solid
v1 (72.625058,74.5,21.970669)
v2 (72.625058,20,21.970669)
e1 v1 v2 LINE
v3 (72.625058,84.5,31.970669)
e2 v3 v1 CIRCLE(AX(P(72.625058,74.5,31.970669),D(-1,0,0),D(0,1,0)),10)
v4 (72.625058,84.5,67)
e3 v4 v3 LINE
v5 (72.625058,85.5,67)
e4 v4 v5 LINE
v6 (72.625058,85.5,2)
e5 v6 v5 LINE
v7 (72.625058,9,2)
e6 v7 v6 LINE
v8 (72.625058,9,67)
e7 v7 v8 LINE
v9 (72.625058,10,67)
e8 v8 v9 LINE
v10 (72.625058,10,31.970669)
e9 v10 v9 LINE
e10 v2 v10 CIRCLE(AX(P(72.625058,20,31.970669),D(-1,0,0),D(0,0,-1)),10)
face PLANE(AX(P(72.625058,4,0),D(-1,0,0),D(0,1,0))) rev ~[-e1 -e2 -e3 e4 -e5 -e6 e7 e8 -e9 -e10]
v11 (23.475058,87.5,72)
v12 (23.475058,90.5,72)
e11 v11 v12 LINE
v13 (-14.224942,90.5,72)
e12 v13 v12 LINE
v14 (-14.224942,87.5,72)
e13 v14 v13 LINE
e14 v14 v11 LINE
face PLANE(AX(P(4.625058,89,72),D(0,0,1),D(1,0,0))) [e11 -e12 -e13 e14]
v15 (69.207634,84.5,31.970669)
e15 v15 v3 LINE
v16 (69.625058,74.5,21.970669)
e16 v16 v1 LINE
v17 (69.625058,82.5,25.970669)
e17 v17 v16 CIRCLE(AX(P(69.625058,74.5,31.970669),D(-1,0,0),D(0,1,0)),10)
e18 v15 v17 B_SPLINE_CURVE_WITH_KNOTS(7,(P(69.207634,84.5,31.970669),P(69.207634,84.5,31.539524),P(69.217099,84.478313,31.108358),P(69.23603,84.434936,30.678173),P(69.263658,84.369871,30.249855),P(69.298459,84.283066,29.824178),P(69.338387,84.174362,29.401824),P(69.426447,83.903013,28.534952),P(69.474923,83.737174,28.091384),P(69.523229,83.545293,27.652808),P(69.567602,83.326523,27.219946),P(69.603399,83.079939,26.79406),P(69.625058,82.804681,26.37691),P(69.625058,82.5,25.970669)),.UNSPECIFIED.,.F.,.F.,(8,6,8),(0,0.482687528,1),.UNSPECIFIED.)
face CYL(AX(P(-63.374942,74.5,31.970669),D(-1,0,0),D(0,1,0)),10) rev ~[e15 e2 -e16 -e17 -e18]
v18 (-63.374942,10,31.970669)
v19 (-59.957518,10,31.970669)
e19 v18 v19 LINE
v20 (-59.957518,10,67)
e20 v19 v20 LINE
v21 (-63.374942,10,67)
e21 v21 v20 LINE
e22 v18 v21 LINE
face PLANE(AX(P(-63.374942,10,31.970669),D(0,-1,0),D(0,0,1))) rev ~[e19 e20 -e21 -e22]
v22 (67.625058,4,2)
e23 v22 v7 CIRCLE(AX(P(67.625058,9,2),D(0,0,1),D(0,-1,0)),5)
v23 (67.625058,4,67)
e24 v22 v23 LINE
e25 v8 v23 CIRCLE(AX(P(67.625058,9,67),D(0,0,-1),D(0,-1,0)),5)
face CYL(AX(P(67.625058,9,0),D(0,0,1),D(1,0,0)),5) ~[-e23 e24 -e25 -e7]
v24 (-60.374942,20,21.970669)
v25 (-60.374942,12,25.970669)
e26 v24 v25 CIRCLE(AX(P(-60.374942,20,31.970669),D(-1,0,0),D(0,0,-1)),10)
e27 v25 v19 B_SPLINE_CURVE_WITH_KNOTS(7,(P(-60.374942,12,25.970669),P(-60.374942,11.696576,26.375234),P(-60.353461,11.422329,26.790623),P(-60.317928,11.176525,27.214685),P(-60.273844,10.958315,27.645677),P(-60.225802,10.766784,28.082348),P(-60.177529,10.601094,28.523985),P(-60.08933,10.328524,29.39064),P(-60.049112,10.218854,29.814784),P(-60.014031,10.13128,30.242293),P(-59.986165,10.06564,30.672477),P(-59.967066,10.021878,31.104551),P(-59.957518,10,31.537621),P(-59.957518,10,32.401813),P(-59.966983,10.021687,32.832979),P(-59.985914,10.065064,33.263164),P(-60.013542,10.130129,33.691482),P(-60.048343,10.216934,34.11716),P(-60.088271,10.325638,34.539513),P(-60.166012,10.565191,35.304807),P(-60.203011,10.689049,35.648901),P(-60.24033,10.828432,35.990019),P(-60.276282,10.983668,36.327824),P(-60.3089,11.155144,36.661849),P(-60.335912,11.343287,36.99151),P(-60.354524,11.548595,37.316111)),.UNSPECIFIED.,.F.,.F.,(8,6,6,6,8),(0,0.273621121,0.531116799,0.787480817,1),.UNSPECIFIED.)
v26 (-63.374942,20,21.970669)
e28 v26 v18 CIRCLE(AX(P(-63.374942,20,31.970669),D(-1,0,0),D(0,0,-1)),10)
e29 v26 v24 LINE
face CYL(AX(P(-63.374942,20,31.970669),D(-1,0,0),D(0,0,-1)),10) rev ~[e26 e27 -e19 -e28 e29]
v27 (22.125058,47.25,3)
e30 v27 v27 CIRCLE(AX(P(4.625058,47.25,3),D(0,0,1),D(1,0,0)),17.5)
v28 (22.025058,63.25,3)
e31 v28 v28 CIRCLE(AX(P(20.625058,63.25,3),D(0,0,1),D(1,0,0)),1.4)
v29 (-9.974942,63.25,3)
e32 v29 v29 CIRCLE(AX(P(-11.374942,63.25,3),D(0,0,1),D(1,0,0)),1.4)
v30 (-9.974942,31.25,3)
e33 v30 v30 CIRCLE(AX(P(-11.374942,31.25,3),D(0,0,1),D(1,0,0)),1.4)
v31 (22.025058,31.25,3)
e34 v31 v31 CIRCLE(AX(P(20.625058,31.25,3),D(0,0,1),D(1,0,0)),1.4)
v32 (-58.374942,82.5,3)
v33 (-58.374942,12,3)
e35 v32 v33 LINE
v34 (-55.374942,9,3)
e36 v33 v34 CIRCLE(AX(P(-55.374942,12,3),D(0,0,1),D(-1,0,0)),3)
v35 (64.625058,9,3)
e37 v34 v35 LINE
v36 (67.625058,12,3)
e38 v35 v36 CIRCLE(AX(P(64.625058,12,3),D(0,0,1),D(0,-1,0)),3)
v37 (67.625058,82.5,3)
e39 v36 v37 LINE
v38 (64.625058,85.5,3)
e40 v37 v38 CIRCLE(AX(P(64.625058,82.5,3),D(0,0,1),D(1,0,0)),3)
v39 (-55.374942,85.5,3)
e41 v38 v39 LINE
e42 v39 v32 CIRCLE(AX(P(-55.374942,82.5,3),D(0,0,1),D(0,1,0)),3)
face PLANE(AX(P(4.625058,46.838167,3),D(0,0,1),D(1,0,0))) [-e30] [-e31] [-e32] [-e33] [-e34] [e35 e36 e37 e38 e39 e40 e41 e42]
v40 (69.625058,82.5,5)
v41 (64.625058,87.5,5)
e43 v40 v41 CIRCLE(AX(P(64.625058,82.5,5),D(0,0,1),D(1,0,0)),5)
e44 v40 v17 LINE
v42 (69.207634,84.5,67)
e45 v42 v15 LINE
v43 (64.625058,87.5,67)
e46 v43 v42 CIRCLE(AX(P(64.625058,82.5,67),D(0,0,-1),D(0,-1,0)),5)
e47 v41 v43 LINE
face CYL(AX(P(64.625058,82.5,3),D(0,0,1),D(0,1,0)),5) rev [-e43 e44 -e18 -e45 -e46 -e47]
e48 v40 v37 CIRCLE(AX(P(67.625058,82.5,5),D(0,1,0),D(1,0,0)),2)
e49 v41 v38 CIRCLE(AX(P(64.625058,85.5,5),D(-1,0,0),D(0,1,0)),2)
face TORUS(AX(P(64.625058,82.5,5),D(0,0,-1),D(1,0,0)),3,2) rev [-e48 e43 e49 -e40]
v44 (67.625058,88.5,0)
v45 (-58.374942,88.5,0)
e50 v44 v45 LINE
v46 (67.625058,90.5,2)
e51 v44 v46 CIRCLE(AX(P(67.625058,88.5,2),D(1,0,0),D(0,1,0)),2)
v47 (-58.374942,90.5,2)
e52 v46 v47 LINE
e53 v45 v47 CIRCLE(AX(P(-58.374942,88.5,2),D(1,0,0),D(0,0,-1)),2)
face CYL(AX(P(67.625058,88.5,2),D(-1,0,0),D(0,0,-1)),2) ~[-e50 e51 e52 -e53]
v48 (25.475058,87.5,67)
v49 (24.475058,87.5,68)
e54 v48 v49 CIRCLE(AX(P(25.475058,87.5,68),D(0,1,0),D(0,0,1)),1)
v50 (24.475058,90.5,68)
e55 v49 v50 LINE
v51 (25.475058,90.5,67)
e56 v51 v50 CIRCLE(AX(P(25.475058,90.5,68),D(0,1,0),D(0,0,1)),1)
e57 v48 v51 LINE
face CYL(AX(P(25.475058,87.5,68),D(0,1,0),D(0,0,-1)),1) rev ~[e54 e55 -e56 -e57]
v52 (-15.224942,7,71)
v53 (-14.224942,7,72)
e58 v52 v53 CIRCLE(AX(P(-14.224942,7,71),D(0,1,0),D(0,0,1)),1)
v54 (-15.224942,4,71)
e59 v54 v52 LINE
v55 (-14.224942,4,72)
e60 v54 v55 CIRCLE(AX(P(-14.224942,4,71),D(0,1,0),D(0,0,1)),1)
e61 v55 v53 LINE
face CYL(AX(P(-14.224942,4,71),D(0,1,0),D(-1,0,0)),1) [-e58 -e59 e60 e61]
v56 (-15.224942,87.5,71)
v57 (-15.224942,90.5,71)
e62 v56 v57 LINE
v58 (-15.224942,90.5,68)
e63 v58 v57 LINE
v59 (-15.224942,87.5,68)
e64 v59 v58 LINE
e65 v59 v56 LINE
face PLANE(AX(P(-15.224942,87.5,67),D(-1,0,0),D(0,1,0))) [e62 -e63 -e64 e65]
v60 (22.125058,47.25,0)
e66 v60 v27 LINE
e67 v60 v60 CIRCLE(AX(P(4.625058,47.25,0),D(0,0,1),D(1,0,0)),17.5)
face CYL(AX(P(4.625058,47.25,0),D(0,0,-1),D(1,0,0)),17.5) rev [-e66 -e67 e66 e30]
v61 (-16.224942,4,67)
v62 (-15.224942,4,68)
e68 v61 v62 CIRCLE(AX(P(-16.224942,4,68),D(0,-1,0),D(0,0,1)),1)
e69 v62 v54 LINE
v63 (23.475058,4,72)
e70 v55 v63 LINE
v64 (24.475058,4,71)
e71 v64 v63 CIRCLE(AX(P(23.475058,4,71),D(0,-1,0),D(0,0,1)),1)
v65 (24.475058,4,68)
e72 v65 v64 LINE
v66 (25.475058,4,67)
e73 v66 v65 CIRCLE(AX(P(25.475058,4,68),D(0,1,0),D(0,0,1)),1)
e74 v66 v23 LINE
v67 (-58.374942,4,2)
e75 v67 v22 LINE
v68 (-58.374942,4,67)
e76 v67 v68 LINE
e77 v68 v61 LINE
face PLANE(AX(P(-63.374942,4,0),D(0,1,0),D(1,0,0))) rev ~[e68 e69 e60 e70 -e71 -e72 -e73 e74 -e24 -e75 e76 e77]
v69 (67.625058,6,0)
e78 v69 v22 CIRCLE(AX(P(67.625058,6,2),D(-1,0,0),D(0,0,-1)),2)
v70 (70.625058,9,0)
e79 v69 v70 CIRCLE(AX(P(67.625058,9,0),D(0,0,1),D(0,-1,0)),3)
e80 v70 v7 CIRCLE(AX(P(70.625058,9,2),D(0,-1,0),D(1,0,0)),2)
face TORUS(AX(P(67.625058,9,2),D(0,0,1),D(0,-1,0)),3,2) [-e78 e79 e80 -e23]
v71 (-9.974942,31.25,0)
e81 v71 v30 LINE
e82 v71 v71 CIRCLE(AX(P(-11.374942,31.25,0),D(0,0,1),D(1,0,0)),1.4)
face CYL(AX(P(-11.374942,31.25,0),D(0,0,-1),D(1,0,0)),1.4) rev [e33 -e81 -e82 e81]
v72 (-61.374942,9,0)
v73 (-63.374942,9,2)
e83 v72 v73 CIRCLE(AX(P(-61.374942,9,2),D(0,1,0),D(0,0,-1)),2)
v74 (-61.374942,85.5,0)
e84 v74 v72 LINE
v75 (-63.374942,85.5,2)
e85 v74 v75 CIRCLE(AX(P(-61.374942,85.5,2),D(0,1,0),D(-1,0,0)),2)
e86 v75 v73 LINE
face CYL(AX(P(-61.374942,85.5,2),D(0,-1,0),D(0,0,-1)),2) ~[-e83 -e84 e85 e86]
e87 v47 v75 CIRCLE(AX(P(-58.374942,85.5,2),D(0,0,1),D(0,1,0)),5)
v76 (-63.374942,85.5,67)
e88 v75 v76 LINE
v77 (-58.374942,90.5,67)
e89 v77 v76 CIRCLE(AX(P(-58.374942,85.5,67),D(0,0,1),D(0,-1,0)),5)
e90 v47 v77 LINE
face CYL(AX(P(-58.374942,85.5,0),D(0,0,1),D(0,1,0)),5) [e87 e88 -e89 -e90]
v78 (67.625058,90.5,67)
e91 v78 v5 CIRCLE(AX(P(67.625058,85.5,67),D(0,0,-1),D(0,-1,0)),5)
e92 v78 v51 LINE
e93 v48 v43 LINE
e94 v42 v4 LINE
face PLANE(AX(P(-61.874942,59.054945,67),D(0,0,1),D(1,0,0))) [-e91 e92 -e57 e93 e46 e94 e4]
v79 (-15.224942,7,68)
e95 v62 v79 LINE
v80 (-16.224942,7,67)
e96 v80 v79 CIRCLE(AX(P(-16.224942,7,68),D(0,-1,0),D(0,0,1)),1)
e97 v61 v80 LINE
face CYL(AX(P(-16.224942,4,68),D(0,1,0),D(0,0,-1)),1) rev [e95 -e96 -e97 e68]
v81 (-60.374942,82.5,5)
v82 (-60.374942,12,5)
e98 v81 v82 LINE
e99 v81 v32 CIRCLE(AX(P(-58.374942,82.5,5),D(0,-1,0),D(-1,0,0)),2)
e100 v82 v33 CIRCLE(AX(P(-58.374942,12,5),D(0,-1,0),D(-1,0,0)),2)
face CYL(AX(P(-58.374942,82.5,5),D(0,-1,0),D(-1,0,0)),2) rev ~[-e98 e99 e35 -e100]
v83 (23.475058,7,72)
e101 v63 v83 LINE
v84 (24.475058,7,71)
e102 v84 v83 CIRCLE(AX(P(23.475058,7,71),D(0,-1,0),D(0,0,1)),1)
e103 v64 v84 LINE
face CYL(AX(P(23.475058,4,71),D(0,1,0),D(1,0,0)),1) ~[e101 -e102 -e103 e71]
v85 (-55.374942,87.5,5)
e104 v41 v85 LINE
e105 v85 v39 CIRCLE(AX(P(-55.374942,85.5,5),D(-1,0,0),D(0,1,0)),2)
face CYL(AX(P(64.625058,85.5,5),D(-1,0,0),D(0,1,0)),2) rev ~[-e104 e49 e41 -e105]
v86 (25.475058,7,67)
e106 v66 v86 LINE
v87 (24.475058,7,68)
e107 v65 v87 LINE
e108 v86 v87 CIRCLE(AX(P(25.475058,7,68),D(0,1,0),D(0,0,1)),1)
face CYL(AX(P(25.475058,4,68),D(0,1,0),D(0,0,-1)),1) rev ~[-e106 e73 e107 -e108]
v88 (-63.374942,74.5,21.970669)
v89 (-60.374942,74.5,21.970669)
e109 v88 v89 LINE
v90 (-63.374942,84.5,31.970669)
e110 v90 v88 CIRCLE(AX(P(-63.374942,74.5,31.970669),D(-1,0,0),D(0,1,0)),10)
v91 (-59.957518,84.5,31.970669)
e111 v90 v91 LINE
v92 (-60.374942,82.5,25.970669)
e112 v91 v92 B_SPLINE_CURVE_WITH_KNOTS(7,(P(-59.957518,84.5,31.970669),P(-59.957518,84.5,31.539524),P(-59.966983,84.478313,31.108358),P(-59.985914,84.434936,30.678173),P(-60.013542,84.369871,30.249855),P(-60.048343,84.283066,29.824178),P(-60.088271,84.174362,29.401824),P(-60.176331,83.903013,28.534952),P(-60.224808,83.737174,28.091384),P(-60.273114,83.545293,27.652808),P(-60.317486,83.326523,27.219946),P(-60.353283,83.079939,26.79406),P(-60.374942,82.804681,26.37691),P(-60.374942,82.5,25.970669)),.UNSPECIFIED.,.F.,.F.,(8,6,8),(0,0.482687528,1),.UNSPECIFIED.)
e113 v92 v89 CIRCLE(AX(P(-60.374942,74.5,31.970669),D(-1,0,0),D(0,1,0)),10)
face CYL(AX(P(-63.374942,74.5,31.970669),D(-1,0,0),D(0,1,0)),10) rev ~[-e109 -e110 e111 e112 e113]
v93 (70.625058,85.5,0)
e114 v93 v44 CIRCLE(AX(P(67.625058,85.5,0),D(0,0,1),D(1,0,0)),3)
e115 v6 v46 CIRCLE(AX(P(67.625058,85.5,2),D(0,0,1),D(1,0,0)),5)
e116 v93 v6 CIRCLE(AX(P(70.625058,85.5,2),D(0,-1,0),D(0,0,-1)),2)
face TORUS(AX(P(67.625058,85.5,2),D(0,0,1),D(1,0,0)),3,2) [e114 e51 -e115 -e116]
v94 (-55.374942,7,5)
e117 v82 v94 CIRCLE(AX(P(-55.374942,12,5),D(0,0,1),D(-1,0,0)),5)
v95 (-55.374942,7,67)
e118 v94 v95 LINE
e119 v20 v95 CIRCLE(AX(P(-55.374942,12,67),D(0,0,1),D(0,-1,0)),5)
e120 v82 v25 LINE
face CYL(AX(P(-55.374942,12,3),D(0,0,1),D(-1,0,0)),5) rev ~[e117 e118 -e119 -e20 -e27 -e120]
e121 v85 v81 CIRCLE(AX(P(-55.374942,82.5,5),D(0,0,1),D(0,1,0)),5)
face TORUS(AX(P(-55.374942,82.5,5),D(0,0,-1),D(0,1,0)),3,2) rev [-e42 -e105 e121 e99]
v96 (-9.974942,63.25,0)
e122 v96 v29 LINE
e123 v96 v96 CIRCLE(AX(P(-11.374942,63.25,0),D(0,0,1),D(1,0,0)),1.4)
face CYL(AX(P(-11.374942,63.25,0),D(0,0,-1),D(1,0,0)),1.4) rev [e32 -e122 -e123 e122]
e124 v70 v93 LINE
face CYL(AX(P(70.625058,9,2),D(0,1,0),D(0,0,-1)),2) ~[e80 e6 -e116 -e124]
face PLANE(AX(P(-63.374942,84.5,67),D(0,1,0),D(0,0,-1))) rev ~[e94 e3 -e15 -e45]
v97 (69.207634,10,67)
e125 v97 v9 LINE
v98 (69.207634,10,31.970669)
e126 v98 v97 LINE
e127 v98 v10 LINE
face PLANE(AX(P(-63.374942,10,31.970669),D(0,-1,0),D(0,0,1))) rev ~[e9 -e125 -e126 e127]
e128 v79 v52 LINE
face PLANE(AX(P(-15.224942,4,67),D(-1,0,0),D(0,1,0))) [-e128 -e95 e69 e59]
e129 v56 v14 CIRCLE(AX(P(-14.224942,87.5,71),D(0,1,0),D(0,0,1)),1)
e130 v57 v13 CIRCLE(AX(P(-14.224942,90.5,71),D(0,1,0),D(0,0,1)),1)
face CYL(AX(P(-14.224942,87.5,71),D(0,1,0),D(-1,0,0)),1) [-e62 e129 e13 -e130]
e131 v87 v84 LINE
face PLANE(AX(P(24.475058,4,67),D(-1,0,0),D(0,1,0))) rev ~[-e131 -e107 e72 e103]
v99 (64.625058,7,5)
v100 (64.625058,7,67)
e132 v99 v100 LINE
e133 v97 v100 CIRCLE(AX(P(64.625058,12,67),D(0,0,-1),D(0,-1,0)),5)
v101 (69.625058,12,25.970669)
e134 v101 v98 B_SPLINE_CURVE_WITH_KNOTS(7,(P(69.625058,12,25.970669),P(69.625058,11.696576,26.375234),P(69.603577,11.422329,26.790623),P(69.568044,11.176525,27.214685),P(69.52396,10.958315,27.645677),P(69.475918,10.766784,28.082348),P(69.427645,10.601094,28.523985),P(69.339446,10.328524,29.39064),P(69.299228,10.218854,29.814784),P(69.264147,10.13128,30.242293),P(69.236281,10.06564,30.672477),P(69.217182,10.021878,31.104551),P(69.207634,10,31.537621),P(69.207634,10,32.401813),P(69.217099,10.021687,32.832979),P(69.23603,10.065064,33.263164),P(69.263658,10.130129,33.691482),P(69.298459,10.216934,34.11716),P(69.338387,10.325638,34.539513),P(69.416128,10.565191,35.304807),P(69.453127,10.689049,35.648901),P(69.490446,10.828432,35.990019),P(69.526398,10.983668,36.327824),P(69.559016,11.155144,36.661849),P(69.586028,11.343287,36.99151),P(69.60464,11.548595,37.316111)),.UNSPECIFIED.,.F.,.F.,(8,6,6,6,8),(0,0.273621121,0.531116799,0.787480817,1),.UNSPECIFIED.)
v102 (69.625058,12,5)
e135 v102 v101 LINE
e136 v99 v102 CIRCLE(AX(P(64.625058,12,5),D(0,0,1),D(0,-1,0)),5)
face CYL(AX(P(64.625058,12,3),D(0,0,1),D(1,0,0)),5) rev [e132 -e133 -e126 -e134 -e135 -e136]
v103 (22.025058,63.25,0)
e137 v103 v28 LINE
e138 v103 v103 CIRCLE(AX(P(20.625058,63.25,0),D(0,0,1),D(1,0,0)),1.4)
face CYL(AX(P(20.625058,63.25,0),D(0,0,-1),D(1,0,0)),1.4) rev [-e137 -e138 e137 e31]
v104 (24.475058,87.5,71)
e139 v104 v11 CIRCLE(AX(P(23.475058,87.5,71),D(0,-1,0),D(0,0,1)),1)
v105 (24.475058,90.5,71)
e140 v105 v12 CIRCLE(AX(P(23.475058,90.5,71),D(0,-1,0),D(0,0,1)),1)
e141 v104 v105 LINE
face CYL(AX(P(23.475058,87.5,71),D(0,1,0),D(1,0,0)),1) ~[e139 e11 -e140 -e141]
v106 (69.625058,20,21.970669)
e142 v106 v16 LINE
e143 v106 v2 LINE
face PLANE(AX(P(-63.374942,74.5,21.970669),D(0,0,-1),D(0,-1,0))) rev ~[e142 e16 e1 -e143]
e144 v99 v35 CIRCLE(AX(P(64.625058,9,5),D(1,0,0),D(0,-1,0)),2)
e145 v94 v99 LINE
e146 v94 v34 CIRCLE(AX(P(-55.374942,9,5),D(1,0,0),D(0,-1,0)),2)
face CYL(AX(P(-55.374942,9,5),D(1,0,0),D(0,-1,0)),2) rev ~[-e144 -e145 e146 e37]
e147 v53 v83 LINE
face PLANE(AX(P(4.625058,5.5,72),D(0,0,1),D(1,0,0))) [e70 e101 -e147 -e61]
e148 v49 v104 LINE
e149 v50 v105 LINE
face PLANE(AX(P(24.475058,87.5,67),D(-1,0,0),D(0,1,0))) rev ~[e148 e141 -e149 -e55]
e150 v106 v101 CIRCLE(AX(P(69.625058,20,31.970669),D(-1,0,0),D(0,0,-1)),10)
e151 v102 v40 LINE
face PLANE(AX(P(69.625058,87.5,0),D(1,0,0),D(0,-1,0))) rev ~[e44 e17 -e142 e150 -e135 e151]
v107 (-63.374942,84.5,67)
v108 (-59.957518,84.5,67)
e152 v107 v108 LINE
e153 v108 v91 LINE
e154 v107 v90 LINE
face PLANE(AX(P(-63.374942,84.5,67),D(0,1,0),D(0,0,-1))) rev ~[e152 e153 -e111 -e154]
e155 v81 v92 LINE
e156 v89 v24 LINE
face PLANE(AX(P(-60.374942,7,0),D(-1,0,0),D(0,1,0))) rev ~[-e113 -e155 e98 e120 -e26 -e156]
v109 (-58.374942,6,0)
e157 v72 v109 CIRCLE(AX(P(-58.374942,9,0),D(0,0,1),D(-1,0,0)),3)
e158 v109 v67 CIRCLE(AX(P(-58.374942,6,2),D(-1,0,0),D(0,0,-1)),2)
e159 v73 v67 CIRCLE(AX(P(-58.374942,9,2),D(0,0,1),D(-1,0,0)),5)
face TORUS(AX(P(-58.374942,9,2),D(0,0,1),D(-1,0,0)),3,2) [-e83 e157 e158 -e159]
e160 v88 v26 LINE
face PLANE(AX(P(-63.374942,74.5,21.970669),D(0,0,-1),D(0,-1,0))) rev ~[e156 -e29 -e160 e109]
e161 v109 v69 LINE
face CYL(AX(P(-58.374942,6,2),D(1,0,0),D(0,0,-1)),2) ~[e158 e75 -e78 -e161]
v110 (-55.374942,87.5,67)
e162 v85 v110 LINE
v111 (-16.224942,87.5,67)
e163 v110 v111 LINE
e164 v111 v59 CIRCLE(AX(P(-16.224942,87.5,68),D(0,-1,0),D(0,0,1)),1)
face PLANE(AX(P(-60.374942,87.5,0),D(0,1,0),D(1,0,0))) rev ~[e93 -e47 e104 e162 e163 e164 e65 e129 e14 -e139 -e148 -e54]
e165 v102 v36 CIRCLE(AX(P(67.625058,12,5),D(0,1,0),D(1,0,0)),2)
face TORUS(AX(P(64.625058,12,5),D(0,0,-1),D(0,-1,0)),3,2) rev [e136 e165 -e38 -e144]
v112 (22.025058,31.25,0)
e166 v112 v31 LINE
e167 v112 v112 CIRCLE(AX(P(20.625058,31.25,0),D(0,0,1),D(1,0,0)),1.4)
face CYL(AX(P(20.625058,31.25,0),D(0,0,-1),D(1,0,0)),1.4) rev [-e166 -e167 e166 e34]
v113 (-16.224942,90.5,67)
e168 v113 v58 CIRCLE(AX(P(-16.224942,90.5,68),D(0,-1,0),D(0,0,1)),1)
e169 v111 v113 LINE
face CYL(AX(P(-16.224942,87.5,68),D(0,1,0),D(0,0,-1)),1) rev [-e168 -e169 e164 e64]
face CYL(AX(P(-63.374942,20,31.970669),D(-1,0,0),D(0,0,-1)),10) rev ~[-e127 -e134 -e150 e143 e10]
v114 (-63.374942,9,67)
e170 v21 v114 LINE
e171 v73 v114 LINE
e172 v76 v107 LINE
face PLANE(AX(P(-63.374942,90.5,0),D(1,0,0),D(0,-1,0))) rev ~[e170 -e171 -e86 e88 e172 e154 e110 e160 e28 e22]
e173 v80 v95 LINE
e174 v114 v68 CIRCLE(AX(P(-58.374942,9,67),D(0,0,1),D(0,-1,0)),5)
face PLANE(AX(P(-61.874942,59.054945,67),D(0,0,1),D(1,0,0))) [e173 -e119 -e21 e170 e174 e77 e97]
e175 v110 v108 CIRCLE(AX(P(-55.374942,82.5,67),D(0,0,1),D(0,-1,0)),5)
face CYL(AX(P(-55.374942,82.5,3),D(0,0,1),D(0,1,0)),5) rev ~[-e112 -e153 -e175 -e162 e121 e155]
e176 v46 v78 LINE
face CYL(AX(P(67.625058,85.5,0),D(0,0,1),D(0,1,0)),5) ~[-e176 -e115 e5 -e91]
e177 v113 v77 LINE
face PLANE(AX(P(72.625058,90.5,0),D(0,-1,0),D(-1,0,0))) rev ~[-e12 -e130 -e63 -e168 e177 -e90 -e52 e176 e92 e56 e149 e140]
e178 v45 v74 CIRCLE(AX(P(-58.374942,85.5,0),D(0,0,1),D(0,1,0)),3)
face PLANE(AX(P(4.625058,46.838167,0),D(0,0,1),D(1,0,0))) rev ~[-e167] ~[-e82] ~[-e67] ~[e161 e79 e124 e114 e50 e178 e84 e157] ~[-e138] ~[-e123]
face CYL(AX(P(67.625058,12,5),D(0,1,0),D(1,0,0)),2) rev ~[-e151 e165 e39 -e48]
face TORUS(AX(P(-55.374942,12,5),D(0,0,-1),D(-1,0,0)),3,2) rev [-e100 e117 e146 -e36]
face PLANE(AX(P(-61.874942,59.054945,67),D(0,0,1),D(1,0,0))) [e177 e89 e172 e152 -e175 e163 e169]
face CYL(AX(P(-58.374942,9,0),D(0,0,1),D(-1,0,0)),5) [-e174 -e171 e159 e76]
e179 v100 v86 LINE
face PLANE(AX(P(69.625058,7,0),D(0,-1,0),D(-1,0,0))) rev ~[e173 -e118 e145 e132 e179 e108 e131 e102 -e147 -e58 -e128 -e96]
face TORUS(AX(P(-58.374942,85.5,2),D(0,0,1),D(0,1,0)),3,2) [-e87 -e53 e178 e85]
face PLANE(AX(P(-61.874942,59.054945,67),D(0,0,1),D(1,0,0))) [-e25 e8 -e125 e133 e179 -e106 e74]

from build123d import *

# Parameters (mm, degrees)
F0_R     = 3
F0_R_2   = 1.4
F0_R_3   = 17.5
F0_R_4   = 1.5
F1_DEPTH = 3
F0_W     = 65
F0_H     = 3
F2_DEPTH = 67
F4_DEPTH = 136.001
F5_W     = 39.7
F5_H     = 3
F6_W     = 39.7
F6_H     = 3
F7_DEPTH = 5
F8_R     = 1
F9_R     = 5
F10_R    = 2


# Not quite as in the source:
# - a feature names something its author has since deleted; it is built from what else it names


with BuildPart() as f1:
    # F0 (on Top) → F1 (new body)
    with BuildSketch(Plane.XY):
        Polygon((-60.3749420391, 27.6098903269), (-60.3749420391, 7), (-15.3749420391, 7), (-15.3749420391, 12), (24.6250579609, 12), (24.6250579609, 7), (69.6250579609, 7), (69.6250579609, 53.4099719524), (69.6250579609, 87.5), (4.6250579609, 87.5), (-60.3749420391, 87.5), (-60.3749420391, 71.25), align=None)
        with Locations((-30.3749420391, 23.25)):
            Circle(F0_R, mode=Mode.SUBTRACT)
        with Locations((-11.3749420391, 31.25)):
            Circle(F0_R_2, mode=Mode.SUBTRACT)
        with Locations((20.6250579609, 31.25)):
            Circle(F0_R_2, mode=Mode.SUBTRACT)
        with Locations((52.6250579609, 23.25)):
            Circle(F0_R, mode=Mode.SUBTRACT)
        with Locations((-11.3749420391, 63.25)):
            Circle(F0_R_2, mode=Mode.SUBTRACT)
        with BuildLine():
            ThreePointArc((-27.3749420391, 71.25), (-30.3749420391, 68.25), (-33.3749420391, 71.25))
            ThreePointArc((-33.3749420391, 71.25), (-30.3749420391, 74.25), (-27.3749420391, 71.25))
        make_face(mode=Mode.SUBTRACT)
        with Locations((4.6250579609, 47.25)):
            Circle(F0_R_3, mode=Mode.SUBTRACT)
        with Locations((20.6250579609, 63.25)):
            Circle(F0_R_2, mode=Mode.SUBTRACT)
        with Locations((52.6250579609, 71.25)):
            Circle(F0_R, mode=Mode.SUBTRACT)
        Polygon((-15.3749420391, 12), (-15.3749420391, 7), (14.8769766092, 7), (24.6250579609, 7), (24.6250579609, 12), align=None)
        with BuildLine():
            ThreePointArc((-27.3749420391, 71.25), (-30.3749420391, 74.25), (-33.3749420391, 71.25))
            ThreePointArc((-33.3749420391, 71.25), (-30.3749420391, 68.25), (-27.3749420391, 71.25))
        make_face()
        with BuildLine():
            ThreePointArc((-28.8749420391, 71.25), (-30.3749420391, 69.75), (-31.8749420391, 71.25))
            ThreePointArc((-31.8749420391, 71.25), (-30.3749420391, 72.75), (-28.8749420391, 71.25))
        make_face(mode=Mode.SUBTRACT)
        with BuildLine():
            ThreePointArc((-28.8749420391, 71.25), (-30.3749420391, 72.75), (-31.8749420391, 71.25))
            ThreePointArc((-31.8749420391, 71.25), (-30.3749420391, 69.75), (-28.8749420391, 71.25))
        make_face()
        with Locations((52.6250579609, 71.25)):
            Circle(F0_R)
        with Locations((52.6250579609, 71.25)):
            Circle(F0_R_4, mode=Mode.SUBTRACT)
        with Locations((52.6250579609, 71.25)):
            Circle(F0_R_4)
        with Locations((52.6250579609, 23.25)):
            Circle(F0_R)
        with Locations((52.6250579609, 23.25)):
            Circle(F0_R_4, mode=Mode.SUBTRACT)
        with Locations((52.6250579609, 23.25)):
            Circle(F0_R_4)
        with Locations((-30.3749420391, 23.25)):
            Circle(F0_R)
        with Locations((-30.3749420391, 23.25)):
            Circle(F0_R_4, mode=Mode.SUBTRACT)
        with Locations((-30.3749420391, 23.25)):
            Circle(F0_R_4)
    extrude(amount=F1_DEPTH)

    # F0 (on Top) → F2 (join)
    with BuildSketch(Plane.XY):
        Polygon((-63.3749420391, 27.6098903269), (-60.3749420391, 27.6098903269), (-60.3749420391, 71.25), (-60.3749420391, 87.5), (-60.3749420391, 90.5), (-63.3749420391, 90.5), align=None)
        with Locations((-27.8749420391, 89)):
            Rectangle(F0_W, F0_H)
        with Locations((37.1250579609, 89)):
            Rectangle(F0_W, F0_H)
        Polygon((69.6250579609, 87.5), (69.6250579609, 53.4099719524), (72.6250579609, 53.4099719524), (72.6250579609, 90.5), (69.6250579609, 90.5), align=None)
        Polygon((69.6250579609, 7), (69.6250579609, 4), (72.6250579609, 4), (72.6250579609, 53.4099719524), (69.6250579609, 53.4099719524), align=None)
        Polygon((14.8769766092, 4), (69.6250579609, 4), (69.6250579609, 7), (24.6250579609, 7), (14.8769766092, 7), align=None)
        Polygon((-60.3749420391, 7), (-60.3749420391, 4), (14.8769766092, 4), (14.8769766092, 7), (-15.3749420391, 7), align=None)
        Polygon((-63.3749420391, 4), (-60.3749420391, 4), (-60.3749420391, 7), (-60.3749420391, 27.6098903269), (-63.3749420391, 27.6098903269), align=None)
    extrude(amount=F2_DEPTH)

    # F3 (on face) → F4 (cut, through all)
    with BuildSketch(Plane(origin=(-63.3749420391, 0, 0), x_dir=(0, -1, 0), z_dir=(-1, 0, 0))):
        with BuildLine():
            ThreePointArc((-20, 21.9706685841), (-12.9289321881, 24.8996007722), (-10, 31.9706685841))
            ThreePointArc((-10, 31.9706685841), (-20, 41.9706685841), (-30, 31.9706685841))
            ThreePointArc((-30, 31.9706685841), (-27.0710678119, 24.8996007722), (-20, 21.9706685841))
        make_face()
        with BuildLine():
            ThreePointArc((-30, 31.9706685841), (-20, 41.9706685841), (-10, 31.9706685841))
            Line((-10, 31.9706685841), (-10, 67))
            Line((-10, 67), (-30, 67))
            Line((-30, 67), (-30, 31.9706685841))
        make_face()
        with BuildLine():
            ThreePointArc((-74.5, 21.9706685841), (-67.4289321881, 24.8996007722), (-64.5, 31.9706685841))
            ThreePointArc((-64.5, 31.9706685841), (-74.5, 41.9706685841), (-84.5, 31.9706685841))
            ThreePointArc((-84.5, 31.9706685841), (-81.5710678119, 24.8996007722), (-74.5, 21.9706685841))
        make_face()
        with BuildLine():
            Line((-64.5, 31.9706685841), (-30, 31.9706685841))
            Line((-30, 31.9706685841), (-30, 67))
            Line((-30, 67), (-84.5, 67))
            Line((-84.5, 67), (-84.5, 31.9706685841))
            ThreePointArc((-84.5, 31.9706685841), (-74.5, 41.9706685841), (-64.5, 31.9706685841))
        make_face()
        with BuildLine():
            ThreePointArc((-20, 21.9706685841), (-27.0710678119, 24.8996007722), (-30, 31.9706685841))
            Line((-30, 31.9706685841), (-64.5, 31.9706685841))
            ThreePointArc((-64.5, 31.9706685841), (-67.4289321881, 24.8996007722), (-74.5, 21.9706685841))
            Line((-74.5, 21.9706685841), (-20, 21.9706685841))
        make_face()
    extrude(amount=-F4_DEPTH, mode=Mode.SUBTRACT)

    # F5 (on face) + F6 (on face) → F7 (join)
    with BuildSketch(Plane.XY.offset(67)):
        with Locations((4.6250579609, 5.5)):
            Rectangle(F5_W, F5_H)
    with BuildSketch(Plane.XY.offset(67)):
        with Locations((4.6250579609, 89)):
            Rectangle(F6_W, F6_H)
    extrude(amount=F7_DEPTH)

    # F8
    f8_edges = [f1.edges().sort_by_distance(p)[0] for p in [
        (-15.224942, 5.5, 67),
        (-15.224942, 5.5, 72),
        (24.475058, 5.5, 72),
        (24.475058, 5.5, 67),
        (-15.224942, 89, 67),
        (-15.224942, 89, 72),
        (24.475058, 89, 72),
        (24.475058, 89, 67),
    ]]
    fillet(f8_edges, radius=F8_R)

    # F9
    f9_edges = [f1.edges().sort_by_distance(p)[0] for p in [
        (72.625058, 4, 33.5),
        (72.625058, 90.5, 33.5),
        (-63.374942, 90.5, 33.5),
        (-63.374942, 4, 33.5),
        (-60.374942, 7, 35),
        (-60.374942, 87.5, 35),
        (69.625058, 87.5, 35),
        (69.625058, 7, 35),
    ]]
    fillet(f9_edges, radius=F9_R)

    # F10
    f10_edges = [f1.edges().sort_by_distance(p)[0] for p in [
        (4.625058, 87.5, 3),
        (4.625058, 4, 0),
    ]]
    fillet(f10_edges, radius=F10_R)


solid = f1.part
